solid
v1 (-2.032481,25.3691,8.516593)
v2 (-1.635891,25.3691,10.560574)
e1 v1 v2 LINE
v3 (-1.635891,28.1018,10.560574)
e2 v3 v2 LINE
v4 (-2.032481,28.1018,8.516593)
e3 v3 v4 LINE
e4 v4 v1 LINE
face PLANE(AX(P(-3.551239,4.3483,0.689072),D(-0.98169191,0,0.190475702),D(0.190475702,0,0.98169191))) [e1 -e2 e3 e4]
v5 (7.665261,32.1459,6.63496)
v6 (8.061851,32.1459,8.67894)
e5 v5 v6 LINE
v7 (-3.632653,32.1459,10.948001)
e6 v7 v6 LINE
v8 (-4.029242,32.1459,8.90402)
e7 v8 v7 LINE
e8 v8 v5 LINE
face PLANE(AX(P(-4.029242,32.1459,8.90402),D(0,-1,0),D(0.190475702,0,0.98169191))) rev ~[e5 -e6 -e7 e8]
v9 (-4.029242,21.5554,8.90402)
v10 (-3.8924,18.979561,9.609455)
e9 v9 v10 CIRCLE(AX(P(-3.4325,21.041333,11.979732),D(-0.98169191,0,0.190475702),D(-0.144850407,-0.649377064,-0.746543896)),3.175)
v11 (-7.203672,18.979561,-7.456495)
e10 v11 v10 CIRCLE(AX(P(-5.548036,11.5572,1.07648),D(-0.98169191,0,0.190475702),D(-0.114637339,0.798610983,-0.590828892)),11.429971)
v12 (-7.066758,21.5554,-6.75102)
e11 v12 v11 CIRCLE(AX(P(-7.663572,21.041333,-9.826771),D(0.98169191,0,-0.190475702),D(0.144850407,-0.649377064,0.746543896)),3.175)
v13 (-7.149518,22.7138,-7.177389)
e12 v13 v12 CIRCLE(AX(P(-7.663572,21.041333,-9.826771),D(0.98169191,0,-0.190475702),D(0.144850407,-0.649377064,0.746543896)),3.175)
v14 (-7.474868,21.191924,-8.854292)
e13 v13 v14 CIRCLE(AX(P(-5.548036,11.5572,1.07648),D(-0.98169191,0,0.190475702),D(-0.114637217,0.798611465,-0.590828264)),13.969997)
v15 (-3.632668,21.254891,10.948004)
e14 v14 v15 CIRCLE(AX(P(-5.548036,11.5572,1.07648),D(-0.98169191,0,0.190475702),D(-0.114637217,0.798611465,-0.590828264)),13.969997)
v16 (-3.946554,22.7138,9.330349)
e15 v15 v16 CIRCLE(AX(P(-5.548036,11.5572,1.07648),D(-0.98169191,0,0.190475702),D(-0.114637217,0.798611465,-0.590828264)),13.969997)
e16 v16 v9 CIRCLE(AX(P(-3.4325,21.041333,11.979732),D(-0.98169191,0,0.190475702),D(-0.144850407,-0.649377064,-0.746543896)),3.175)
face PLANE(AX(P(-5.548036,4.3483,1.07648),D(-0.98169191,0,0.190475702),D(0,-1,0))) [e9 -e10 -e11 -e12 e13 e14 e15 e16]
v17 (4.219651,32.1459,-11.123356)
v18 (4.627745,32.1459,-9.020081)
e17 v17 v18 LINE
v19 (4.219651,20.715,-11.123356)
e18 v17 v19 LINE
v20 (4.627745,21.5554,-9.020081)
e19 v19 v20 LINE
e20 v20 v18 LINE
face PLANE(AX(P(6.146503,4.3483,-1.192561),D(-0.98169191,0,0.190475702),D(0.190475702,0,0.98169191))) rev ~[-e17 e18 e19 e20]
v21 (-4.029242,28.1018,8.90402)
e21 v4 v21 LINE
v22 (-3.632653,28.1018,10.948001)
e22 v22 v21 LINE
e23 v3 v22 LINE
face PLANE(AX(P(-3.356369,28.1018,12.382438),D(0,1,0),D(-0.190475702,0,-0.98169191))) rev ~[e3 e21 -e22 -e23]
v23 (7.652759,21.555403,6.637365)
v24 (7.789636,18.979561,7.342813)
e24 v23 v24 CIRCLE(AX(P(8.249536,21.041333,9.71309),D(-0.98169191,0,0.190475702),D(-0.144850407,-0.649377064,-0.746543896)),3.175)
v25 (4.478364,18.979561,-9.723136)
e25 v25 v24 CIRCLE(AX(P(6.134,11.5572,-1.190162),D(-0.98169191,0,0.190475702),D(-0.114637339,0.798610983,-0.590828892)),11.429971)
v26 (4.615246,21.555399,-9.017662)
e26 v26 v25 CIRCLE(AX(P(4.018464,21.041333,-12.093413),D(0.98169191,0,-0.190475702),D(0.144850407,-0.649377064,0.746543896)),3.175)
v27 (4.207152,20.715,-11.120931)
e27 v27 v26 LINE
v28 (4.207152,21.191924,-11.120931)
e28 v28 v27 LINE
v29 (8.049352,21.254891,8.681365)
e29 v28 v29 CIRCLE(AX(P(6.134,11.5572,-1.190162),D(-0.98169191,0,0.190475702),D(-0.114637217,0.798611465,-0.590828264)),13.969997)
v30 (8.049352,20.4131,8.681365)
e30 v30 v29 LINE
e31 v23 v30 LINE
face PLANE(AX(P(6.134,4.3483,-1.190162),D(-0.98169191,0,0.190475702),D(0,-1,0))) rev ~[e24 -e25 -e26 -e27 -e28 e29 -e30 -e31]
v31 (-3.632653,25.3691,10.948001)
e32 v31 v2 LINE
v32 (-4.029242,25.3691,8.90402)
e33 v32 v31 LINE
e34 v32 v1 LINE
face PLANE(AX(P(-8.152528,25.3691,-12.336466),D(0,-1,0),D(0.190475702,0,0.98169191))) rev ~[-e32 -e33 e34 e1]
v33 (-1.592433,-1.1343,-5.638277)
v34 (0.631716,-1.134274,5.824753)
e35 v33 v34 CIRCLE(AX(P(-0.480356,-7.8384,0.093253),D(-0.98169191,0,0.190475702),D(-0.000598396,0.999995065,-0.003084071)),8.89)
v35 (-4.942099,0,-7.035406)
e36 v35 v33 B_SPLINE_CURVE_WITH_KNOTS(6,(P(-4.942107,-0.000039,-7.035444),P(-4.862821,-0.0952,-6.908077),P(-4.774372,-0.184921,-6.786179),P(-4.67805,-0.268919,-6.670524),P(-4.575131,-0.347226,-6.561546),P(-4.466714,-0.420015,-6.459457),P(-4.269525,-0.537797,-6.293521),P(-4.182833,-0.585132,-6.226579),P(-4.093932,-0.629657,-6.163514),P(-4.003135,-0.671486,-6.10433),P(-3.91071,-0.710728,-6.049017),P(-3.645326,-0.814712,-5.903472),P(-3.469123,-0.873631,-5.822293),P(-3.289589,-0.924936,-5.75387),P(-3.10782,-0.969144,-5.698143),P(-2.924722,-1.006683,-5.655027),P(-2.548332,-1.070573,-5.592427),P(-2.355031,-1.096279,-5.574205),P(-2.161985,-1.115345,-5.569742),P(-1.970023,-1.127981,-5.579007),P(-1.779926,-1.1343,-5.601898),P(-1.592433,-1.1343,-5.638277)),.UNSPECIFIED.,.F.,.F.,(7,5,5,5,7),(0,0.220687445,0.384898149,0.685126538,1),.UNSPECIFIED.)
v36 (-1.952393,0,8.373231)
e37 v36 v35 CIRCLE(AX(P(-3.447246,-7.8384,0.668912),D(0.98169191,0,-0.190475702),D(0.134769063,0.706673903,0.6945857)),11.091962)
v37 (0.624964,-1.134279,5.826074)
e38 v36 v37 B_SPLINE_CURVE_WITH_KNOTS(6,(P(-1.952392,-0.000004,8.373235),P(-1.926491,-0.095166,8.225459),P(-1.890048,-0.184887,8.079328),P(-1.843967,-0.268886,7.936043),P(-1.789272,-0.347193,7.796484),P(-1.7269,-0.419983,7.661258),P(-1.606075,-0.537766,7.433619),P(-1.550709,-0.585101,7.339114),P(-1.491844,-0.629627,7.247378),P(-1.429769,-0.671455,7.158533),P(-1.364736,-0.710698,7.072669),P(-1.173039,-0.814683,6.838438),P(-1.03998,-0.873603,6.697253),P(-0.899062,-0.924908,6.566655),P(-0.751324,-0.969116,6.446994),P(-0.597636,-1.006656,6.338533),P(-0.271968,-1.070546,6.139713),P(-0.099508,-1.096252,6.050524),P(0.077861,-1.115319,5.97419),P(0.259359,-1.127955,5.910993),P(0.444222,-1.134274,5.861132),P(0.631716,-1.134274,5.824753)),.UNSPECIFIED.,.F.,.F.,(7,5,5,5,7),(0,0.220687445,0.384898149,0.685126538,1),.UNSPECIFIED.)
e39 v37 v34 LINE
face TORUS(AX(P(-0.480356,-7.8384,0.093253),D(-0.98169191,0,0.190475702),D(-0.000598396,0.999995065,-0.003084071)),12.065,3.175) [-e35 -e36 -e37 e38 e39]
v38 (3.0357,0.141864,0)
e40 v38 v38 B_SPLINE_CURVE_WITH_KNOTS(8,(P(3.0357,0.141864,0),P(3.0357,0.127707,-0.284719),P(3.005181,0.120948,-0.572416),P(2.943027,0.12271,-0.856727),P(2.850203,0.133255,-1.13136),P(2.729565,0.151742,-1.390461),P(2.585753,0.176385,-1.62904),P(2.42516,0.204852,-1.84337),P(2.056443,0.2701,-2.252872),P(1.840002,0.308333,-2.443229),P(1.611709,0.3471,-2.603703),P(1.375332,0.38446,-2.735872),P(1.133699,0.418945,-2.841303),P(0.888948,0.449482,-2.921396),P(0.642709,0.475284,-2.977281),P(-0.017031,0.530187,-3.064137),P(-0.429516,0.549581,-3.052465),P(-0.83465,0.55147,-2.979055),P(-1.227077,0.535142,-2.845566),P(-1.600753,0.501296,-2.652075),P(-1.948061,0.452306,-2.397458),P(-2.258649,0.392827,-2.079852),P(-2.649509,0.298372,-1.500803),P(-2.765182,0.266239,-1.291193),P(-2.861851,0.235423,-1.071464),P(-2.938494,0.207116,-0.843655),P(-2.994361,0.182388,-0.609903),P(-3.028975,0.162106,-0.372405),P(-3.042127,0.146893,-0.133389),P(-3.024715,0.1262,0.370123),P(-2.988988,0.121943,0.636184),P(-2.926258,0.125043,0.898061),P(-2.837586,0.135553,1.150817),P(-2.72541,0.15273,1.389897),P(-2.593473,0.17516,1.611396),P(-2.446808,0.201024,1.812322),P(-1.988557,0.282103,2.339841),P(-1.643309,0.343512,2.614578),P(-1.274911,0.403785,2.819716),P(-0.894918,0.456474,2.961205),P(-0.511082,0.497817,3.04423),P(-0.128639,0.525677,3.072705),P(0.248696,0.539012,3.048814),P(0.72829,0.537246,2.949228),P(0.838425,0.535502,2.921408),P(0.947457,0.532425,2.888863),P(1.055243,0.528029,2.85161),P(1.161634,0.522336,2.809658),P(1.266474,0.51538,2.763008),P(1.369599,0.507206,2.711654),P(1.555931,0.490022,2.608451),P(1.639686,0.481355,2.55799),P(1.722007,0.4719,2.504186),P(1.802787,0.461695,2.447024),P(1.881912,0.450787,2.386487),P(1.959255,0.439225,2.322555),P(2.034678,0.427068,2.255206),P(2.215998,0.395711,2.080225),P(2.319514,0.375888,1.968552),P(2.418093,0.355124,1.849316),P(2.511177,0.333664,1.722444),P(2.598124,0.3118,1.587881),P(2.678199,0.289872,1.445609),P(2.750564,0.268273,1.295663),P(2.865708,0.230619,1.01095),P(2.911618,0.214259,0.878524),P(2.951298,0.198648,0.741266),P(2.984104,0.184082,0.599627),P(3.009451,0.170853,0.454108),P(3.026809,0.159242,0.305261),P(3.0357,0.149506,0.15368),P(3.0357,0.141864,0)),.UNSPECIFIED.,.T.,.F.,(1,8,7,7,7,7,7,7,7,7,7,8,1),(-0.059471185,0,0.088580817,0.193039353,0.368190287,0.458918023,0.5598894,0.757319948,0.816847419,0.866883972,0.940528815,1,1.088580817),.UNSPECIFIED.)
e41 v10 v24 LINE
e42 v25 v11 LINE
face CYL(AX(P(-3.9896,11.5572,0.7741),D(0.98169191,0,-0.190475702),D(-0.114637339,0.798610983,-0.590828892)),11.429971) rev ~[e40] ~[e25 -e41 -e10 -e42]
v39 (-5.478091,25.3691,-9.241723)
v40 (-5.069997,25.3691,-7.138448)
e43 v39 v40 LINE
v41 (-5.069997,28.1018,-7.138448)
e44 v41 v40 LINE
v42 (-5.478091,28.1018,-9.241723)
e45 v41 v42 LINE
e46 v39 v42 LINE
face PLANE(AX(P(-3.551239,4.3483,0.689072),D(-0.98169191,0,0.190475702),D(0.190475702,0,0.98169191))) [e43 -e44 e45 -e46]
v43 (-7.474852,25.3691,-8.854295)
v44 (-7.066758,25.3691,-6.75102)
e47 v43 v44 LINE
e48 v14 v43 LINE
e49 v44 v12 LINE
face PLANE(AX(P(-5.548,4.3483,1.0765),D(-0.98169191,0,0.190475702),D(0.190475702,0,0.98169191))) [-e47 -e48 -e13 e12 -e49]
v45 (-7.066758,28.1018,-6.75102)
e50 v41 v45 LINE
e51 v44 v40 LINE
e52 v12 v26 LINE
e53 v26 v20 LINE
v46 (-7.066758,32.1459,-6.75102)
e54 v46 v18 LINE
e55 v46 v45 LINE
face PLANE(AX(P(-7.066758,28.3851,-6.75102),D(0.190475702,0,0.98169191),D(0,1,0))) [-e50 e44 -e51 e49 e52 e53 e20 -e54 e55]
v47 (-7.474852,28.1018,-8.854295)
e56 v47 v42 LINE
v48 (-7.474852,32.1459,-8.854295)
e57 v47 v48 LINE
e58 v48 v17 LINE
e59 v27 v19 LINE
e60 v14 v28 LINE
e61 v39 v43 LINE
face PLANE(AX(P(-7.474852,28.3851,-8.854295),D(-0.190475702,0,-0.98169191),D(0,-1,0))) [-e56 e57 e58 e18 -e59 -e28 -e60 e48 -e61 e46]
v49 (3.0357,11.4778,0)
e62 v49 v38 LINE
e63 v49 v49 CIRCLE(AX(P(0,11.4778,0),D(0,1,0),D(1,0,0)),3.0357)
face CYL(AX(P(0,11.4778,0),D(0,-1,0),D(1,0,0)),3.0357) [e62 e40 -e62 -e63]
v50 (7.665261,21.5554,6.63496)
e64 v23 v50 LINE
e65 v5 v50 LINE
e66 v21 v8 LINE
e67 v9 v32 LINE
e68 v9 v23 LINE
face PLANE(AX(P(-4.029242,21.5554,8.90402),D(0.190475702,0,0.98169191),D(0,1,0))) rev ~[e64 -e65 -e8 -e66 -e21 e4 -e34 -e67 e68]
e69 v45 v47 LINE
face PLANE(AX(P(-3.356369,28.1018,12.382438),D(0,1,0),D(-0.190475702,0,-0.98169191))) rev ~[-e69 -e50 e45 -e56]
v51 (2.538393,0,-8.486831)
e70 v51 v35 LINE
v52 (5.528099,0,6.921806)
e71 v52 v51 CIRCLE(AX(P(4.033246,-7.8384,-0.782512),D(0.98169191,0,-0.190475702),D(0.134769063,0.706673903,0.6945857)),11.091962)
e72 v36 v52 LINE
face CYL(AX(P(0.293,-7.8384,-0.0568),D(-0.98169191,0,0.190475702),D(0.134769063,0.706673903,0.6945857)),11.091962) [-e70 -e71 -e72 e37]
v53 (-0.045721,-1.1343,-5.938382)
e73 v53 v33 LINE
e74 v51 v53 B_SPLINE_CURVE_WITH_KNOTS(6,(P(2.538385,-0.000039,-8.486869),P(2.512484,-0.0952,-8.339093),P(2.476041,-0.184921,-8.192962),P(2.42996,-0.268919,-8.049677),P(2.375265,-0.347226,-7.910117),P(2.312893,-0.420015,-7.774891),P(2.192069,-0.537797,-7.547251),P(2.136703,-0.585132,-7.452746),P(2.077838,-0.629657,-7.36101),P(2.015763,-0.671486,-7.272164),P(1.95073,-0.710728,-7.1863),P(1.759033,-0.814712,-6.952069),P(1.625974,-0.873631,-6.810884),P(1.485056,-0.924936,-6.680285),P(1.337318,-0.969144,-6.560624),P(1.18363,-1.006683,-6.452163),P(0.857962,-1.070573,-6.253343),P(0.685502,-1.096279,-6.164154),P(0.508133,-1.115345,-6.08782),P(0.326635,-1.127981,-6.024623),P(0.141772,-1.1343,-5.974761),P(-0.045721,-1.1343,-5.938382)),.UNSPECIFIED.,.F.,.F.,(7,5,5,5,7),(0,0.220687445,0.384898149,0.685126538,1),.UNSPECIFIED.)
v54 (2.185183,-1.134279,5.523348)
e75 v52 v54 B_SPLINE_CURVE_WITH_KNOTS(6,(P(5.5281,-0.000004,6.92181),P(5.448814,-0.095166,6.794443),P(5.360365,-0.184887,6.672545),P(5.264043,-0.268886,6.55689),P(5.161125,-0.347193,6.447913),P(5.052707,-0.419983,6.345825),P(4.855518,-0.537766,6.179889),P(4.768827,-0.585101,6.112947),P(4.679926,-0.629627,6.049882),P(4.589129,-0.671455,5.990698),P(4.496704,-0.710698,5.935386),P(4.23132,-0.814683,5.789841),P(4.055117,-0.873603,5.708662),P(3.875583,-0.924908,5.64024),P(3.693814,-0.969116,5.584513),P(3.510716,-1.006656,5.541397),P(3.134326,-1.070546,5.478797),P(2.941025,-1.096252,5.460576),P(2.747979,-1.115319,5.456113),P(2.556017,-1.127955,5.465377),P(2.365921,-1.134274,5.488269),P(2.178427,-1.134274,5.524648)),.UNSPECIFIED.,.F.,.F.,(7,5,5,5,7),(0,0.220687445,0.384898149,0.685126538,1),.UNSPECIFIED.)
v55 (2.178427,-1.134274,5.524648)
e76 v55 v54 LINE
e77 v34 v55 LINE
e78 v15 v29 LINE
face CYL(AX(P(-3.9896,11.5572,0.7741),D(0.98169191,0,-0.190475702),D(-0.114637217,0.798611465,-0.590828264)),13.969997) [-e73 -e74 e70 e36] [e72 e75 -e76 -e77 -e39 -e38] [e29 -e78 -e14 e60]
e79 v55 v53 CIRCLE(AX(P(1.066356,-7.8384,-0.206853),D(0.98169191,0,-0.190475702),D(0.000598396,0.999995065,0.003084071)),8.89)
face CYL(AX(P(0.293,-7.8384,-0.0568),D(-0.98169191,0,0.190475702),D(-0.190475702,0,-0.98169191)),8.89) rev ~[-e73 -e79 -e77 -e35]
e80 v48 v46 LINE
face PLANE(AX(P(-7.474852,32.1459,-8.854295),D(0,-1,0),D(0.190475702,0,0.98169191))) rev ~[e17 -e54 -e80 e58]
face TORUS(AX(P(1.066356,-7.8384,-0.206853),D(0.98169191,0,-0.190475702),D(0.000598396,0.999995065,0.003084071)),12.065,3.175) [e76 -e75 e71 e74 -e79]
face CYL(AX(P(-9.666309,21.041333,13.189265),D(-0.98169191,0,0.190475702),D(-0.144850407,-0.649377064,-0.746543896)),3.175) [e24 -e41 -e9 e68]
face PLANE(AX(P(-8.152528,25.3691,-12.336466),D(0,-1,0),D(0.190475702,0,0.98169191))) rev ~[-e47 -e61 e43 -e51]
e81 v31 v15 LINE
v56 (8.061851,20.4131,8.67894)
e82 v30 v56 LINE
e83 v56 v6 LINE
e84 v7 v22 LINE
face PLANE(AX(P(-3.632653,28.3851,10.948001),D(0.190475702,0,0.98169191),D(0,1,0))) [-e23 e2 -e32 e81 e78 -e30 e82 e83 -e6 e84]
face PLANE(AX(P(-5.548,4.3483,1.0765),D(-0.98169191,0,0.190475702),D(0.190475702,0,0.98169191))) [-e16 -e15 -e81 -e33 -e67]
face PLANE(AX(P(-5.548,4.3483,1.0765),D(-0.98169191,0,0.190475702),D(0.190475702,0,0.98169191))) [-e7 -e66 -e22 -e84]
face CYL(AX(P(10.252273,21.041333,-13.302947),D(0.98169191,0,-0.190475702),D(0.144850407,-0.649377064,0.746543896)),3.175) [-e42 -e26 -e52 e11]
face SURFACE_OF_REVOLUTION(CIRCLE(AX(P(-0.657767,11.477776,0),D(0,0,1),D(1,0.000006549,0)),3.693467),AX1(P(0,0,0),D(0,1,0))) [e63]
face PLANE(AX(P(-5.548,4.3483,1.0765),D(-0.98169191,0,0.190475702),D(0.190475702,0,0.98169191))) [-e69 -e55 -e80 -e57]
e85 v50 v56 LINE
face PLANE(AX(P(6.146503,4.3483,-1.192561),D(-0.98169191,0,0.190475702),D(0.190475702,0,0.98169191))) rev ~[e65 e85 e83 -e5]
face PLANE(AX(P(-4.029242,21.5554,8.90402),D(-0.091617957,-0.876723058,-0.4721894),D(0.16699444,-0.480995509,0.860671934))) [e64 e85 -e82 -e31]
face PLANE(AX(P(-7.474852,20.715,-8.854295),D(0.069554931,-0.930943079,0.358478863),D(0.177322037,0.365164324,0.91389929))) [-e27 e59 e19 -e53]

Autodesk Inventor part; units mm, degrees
ref_plane "YZ Plane" through (0, 0, 0) normal (1, 0, 0) x (0, 1, 0)
sketch "Sketch1" plane through (0, 0, 0) normal (0, 0, 1) x (1, 0, 0)
  line L0 (0, 0) -> (0, 15.1122)
  line L1 (3.0357, 11.4778) -> (3.0357, 0)
  line L2 (3.0357, 0) -> (0, 0)
  arc A0 (3.0357, 11.4778) -> (0, 15.1122) centre (-0.6577, 11.4778) ccw
ref_plane "Work Plane3" through (0, 17.8837, 0) normal (0, 1, 0) x (1, 0, 0)
ref_plane "Work Plane1" through (-3.9896, 4.3483, 0.7741) normal (-0.9816919, 0, 0.1904757) x (0, -1, 0)
sketch "Sketch3" plane through (-3.9896, 4.3483, 0.7741) normal (-0.9816919, 0, 0.1904757) x (0, -1, 0)
  arc A0 (-16.337, -6.8791) -> (-16.337, 6.8791) centre (-7.2089, 0) ccw
  arc A1 (-18.3655, -8.4078) -> (-18.3655, 8.4078) centre (-7.2089, 0) ccw
  line L0 (-13.5354, -0.5887) -> (0.7521, -0.5887) projected
  line L1 (-13.5354, 0.6171) -> (0.7521, 0.6171) projected
  line L2 (-7.2089, 0) -> (-7.9901, -0.5887)
  line L3 (-16.337, -6.8791) -> (-18.3655, -8.4078)
  line L4 (-7.2089, 0) -> (-8.0277, 0.6171)
  line L5 (-16.337, 6.8791) -> (-18.3655, 8.4078)
extrude "Extrusion2" add sketch "Sketch3" along normal blind 1.5875 and the other way blind 10.3124
fillet "Fillet1" radius 3.175 2 edges at (-1.0173, 20.6854, -6.81) (1.6033, 20.6854, 6.6963)
ref_plane "Work Plane2" through (0.293, 4.3483, -0.0568) normal (0.9816919, 0, -0.1904757) x (-0.1904757, 0, -0.9816919)
sketch "Sketch4" plane through (0.293, 4.3483, -0.0568) normal (0.9816919, 0, -0.1904757) x (-0.1904757, 0, -0.9816919)
  circle A0 centre (0, -12.1867) radius 8.89
  arc A1 (-8.4078, 18.3655) -> (8.4078, 18.3655) centre (0, 7.2089) ccw projected
  arc A2 (-7.848, -4.3483) -> (7.848, -4.3483) centre (0, -12.1867) ccw
  point P0 (0, -4.3483)
  point P1 (5.8384, -5.4826)
  point P2 (-5.8384, -5.4826)
  dimension "d17" = 17.78
extrude "Extrusion3" add sketch "Sketch4" along normal mid plane 7.62 contours A0 A1 A2
fillet "Fillet2" radius 3.175 2 edges at (-3.4473, -16.7283, 0.6689) (4.0332, -16.7283, -0.7826)
sketch "Sketch5" plane through (-5.548, 4.3483, 1.0765) normal (-0.9816919, 0, 0.1904757) x (0.1904757, 0, 0.9816919)
  arc A0 (-8.6921, 14.6313) -> (-8.4078, 18.3655) centre (-11.1066, 16.6931) ccw projected
  line L0 (-7.9735, 17.2071) -> (-7.9735, 24.0368)
  line L1 (-10.116, 24.0368) -> (-10.116, 16.3667)
  arc A1 (8.4078, 18.3655) -> (8.6921, 14.6313) centre (11.1066, 16.6931) ccw projected
  line L2 (7.9735, 17.2071) -> (7.9735, 24.0368)
  line L3 (10.0556, 24.0368) -> (10.0556, 16.0648)
  line L4 (-10.116, 16.3667) -> (-7.9735, 17.2071)
  line L5 (7.9735, 17.2071) -> (10.0556, 16.0648)
  line L6 (10.0556, 24.0368) -> (10.0556, 27.7976)
  line L7 (7.9735, 27.7976) -> (7.9735, 21.3706)
  line L8 (-7.9735, 24.0368) -> (-7.9735, 27.7976)
  line L9 (-10.116, 27.7976) -> (-10.116, 24.0368)
  line L10 (-10.116, 27.7976) -> (-7.9735, 27.7976)
  line L11 (7.9735, 27.7976) -> (10.0556, 27.7976)
  point P0 (0, -4.3483)
  point P1 (-7.9735, 31.5584)
  point P2 (-10.116, 31.5584)
extrude "Extrusion4" add sketch "Sketch5" against normal blind 11.9126
sketch "Sketch6" plane through (-5.548, 4.3483, 1.0765) normal (-0.9816919, 0, 0.1904757) x (0.1904757, 0, 0.9816919)
  line L0 (11.5164, 23.7535) -> (-13.6635, 23.7535)
  line L1 (-13.6635, 23.7535) -> (-13.6635, 21.0208)
  line L2 (-13.6635, 21.0208) -> (11.5164, 21.0208)
  line L3 (11.5164, 21.0208) -> (11.5164, 23.7535)
  point P0 (0, -4.3483)
extrude "Extrusion5" cut sketch "Sketch6" against normal blind 2.032
revolve "Revolution3" add sketch "Sketch1" angle 360 about axis through (0, 0, 0) along (0, 1, 0)
properties part number "Clip7"
